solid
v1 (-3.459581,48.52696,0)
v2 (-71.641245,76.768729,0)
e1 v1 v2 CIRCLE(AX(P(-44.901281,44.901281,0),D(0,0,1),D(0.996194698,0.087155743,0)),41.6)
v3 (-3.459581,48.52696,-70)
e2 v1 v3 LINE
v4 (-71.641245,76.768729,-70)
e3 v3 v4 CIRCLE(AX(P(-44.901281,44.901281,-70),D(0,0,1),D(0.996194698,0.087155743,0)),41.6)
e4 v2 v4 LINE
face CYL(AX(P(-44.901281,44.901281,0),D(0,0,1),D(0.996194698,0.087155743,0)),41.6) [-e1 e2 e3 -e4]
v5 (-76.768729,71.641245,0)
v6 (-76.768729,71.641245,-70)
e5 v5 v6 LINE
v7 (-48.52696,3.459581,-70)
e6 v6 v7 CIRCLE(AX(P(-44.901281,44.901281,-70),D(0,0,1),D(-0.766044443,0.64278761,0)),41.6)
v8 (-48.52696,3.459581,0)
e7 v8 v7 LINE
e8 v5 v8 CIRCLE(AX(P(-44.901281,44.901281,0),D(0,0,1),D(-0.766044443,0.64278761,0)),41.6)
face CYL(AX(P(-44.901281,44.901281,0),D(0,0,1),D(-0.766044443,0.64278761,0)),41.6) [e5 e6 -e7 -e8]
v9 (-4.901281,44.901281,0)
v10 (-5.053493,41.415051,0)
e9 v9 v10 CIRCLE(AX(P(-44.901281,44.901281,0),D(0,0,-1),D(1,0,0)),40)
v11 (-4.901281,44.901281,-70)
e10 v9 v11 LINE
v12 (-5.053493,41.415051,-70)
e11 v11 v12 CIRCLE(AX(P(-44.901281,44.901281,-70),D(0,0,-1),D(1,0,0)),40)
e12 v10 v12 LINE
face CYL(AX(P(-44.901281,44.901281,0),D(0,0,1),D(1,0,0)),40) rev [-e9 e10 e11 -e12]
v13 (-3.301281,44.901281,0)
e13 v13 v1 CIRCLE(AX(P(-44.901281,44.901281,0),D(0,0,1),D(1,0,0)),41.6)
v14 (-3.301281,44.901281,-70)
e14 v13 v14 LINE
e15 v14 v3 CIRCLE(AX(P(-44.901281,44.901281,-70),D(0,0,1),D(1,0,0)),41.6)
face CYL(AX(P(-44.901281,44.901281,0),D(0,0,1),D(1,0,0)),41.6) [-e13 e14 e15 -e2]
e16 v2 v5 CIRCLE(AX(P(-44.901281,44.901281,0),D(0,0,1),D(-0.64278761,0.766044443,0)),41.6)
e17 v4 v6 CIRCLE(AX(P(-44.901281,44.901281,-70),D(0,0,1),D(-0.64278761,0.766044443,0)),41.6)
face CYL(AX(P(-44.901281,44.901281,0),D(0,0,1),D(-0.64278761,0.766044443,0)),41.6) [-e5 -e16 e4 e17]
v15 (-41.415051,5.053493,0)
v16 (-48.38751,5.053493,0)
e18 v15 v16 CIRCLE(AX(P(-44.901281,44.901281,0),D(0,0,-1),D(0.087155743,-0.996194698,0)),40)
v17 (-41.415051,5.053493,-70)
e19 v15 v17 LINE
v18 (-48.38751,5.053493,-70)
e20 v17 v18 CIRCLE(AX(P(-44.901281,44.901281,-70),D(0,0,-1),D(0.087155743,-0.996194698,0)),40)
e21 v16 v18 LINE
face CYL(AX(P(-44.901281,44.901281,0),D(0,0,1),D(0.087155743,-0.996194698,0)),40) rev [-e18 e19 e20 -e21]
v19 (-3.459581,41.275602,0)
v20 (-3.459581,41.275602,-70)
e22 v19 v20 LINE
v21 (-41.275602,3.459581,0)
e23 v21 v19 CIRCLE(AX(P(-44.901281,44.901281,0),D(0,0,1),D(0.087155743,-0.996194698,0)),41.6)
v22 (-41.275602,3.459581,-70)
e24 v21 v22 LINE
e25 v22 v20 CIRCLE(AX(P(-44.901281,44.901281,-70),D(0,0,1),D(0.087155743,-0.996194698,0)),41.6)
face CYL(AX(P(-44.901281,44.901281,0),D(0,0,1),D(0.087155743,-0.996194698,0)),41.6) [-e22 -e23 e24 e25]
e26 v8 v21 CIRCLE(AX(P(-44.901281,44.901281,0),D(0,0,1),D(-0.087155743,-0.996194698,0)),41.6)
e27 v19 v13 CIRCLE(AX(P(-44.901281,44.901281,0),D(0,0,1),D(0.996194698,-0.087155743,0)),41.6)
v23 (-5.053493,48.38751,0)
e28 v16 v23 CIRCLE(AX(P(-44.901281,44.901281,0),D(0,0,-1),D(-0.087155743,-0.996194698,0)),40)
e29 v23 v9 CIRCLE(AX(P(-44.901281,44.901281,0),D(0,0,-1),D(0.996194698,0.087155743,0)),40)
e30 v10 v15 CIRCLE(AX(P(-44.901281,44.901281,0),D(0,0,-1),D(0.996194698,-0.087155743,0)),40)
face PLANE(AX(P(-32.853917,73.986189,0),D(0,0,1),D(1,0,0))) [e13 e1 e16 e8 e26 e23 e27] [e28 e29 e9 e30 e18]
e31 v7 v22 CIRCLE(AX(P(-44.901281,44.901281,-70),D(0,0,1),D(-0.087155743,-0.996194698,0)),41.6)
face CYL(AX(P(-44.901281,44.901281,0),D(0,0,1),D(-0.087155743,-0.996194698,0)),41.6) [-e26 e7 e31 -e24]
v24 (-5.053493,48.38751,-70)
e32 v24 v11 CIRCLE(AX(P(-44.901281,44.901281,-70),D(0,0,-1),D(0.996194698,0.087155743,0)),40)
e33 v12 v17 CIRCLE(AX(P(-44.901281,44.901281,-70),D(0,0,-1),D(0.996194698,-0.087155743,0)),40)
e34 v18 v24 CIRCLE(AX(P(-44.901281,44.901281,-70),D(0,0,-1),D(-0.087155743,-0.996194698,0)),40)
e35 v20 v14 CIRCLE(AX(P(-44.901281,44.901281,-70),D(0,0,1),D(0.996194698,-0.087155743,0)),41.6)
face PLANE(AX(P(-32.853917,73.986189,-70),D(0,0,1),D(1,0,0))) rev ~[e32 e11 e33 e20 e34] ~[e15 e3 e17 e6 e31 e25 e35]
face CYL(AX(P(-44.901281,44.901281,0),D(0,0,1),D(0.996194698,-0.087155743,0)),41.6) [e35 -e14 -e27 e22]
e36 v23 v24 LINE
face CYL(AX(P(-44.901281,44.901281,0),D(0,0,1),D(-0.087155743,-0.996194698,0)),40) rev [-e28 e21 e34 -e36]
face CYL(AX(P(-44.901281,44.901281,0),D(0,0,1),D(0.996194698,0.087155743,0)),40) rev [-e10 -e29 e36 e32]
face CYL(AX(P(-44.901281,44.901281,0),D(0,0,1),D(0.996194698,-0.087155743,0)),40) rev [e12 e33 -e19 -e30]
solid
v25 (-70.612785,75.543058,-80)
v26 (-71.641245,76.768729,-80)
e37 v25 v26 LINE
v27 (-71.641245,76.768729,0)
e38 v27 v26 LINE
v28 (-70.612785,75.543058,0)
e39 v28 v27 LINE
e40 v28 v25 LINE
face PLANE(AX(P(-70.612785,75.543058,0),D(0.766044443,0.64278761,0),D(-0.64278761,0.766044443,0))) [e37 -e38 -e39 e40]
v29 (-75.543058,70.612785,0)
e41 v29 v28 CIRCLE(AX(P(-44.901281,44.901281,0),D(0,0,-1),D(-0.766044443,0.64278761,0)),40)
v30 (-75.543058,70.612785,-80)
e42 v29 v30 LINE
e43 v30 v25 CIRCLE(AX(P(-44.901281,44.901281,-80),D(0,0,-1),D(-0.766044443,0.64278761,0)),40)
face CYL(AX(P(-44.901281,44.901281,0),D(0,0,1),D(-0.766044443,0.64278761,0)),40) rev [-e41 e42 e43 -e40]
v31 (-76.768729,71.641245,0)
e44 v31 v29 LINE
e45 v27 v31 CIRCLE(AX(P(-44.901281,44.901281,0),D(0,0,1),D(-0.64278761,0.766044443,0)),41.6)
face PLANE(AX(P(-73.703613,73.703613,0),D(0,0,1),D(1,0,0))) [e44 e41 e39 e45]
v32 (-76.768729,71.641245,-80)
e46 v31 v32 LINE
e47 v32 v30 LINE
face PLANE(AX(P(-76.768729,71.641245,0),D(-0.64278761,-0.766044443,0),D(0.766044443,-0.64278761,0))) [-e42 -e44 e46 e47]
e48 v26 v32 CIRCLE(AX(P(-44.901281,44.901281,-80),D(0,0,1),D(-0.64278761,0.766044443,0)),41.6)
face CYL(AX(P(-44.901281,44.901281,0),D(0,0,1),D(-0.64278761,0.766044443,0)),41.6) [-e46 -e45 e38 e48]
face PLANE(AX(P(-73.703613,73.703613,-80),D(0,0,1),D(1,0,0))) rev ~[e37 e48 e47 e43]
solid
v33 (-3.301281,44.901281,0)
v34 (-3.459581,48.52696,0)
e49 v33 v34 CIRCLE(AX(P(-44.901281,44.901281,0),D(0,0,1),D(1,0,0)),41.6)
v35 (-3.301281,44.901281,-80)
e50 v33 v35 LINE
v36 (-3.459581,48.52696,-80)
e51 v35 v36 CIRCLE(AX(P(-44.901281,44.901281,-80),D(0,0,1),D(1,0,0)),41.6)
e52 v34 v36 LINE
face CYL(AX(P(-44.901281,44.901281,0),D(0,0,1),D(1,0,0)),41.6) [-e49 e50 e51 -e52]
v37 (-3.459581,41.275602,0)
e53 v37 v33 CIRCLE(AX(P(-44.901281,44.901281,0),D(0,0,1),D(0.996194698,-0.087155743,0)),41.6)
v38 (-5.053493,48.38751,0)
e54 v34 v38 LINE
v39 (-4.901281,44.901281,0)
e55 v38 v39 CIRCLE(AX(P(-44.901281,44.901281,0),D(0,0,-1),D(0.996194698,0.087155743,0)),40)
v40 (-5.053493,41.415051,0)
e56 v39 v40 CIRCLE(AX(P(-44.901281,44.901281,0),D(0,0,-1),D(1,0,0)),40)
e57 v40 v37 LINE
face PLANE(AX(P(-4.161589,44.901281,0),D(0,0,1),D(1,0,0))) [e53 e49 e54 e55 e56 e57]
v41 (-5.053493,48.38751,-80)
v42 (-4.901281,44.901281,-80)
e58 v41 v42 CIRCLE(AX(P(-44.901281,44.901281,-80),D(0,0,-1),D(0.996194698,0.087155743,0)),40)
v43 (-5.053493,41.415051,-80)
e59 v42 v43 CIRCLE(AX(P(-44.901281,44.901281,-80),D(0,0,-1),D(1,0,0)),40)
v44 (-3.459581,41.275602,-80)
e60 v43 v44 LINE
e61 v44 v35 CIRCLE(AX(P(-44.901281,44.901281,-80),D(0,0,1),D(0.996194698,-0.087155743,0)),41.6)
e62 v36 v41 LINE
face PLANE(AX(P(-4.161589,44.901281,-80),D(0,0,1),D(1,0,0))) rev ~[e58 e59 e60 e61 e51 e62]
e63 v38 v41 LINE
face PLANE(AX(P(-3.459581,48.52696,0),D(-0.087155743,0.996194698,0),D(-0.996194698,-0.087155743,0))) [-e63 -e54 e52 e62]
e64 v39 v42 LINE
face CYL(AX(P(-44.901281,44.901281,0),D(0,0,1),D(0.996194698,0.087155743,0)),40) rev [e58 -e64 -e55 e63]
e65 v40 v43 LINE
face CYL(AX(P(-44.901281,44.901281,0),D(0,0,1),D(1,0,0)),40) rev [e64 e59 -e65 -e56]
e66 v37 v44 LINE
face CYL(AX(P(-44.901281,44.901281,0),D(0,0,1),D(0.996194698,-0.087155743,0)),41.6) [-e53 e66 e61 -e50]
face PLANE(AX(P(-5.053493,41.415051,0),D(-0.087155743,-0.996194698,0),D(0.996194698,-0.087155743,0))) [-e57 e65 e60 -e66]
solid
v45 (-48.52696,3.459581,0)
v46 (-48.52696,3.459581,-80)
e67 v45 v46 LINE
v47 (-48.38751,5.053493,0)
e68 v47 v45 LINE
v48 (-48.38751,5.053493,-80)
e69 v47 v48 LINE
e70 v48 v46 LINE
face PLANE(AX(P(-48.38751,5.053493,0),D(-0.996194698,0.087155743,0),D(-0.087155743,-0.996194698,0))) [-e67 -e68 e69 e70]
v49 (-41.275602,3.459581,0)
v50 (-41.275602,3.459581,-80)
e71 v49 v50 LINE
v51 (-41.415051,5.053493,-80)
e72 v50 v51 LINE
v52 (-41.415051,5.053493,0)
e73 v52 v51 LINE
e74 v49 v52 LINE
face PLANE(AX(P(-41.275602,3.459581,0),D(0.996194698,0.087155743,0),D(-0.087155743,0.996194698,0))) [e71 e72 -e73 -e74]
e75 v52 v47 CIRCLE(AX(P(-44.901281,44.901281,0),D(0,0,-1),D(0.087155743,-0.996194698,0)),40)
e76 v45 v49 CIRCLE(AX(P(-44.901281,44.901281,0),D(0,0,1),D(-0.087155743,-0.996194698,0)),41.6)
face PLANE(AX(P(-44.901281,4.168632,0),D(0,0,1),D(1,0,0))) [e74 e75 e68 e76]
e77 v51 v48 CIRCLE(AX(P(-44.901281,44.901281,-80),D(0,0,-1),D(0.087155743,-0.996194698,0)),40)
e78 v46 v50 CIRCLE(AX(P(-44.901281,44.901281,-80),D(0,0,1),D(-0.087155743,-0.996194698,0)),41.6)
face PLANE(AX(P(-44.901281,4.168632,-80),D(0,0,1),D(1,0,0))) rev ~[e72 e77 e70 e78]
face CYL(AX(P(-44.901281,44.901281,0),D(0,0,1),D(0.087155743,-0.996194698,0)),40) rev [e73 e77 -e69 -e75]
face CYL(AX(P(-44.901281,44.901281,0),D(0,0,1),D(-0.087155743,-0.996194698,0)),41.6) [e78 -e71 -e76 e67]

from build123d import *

# Parameters (mm, degrees)
F1_DEPTH = 80
F2_DEPTH = 70


with BuildPart() as f1:
    # F0 (on Top) → F1 (new body)
    with BuildSketch(Plane.XY):
        with BuildLine():
            Line((-70.6127849928, 75.5430583301), (-71.6412451683, 76.7687294391))
            ThreePointArc((-71.6412451683, 76.7687294391), (-74.3169227027, 74.3169227027), (-76.7687294391, 71.6412451683))
            Line((-76.7687294391, 71.6412451683), (-75.5430583301, 70.6127849928))
            ThreePointArc((-75.5430583301, 70.6127849928), (-73.1855518528, 73.1855518528), (-70.6127849928, 75.5430583301))
        make_face()
    extrude(amount=-F1_DEPTH)


with BuildPart() as f1b:
    # F0 (on Top) → F1, piece 2 (new body)
    with BuildSketch(Plane.XY):
        with BuildLine():
            Line((-5.0534926817, 41.4150508954), (-3.4595811647, 41.275601707))
            ThreePointArc((-3.4595811647, 41.275601707), (-3.3408745875, 43.0867140909), (-3.3012806053, 44.9012806053))
            ThreePointArc((-3.3012806053, 44.9012806053), (-3.3408745875, 46.7158471197), (-3.4595811647, 48.5269595036))
            Line((-3.4595811647, 48.5269595036), (-5.0534926817, 48.3875103153))
            ThreePointArc((-5.0534926817, 48.3875103153), (-4.9393517421, 46.6460561), (-4.9012806053, 44.9012806053))
            ThreePointArc((-4.9012806053, 44.9012806053), (-4.9393517421, 43.1565051107), (-5.0534926817, 41.4150508954))
        make_face()
    extrude(amount=-F1_DEPTH)


with BuildPart() as f1c:
    # F0 (on Top) → F1, piece 3 (new body)
    with BuildSketch(Plane.XY):
        with BuildLine():
            ThreePointArc((-48.5269595036, 3.4595811647), (-44.9012806053, 3.3012806053), (-41.275601707, 3.4595811647))
            Line((-41.275601707, 3.4595811647), (-41.4150508954, 5.0534926817))
            ThreePointArc((-41.4150508954, 5.0534926817), (-44.9012806053, 4.9012806053), (-48.3875103153, 5.0534926817))
            Line((-48.3875103153, 5.0534926817), (-48.5269595036, 3.4595811647))
        make_face()
    extrude(amount=-F1_DEPTH)


with BuildPart() as f2:
    # F0 (on Top) → F2 (new body)
    with BuildSketch(Plane.XY):
        with BuildLine():
            Line((-5.0534926817, 48.3875103153), (-3.4595811647, 48.5269595036))
            ThreePointArc((-3.4595811647, 48.5269595036), (-28.981649819, 83.3346691578), (-71.6412451683, 76.7687294391))
            Line((-71.6412451683, 76.7687294391), (-70.6127849928, 75.5430583301))
            ThreePointArc((-70.6127849928, 75.5430583301), (-29.5939433107, 81.8564619058), (-5.0534926817, 48.3875103153))
        make_face()
        with BuildLine():
            Line((-70.6127849928, 75.5430583301), (-71.6412451683, 76.7687294391))
            ThreePointArc((-71.6412451683, 76.7687294391), (-74.3169227027, 74.3169227027), (-76.7687294391, 71.6412451683))
            Line((-76.7687294391, 71.6412451683), (-75.5430583301, 70.6127849928))
            ThreePointArc((-75.5430583301, 70.6127849928), (-73.1855518528, 73.1855518528), (-70.6127849928, 75.5430583301))
        make_face()
        with BuildLine():
            ThreePointArc((-76.7687294391, 71.6412451683), (-83.3346691578, 28.981649819), (-48.5269595036, 3.4595811647))
            Line((-48.5269595036, 3.4595811647), (-48.3875103153, 5.0534926817))
            ThreePointArc((-48.3875103153, 5.0534926817), (-81.8564619058, 29.5939433107), (-75.5430583301, 70.6127849928))
            Line((-75.5430583301, 70.6127849928), (-76.7687294391, 71.6412451683))
        make_face()
        with BuildLine():
            ThreePointArc((-48.5269595036, 3.4595811647), (-44.9012806053, 3.3012806053), (-41.275601707, 3.4595811647))
            Line((-41.275601707, 3.4595811647), (-41.4150508954, 5.0534926817))
            ThreePointArc((-41.4150508954, 5.0534926817), (-44.9012806053, 4.9012806053), (-48.3875103153, 5.0534926817))
            Line((-48.3875103153, 5.0534926817), (-48.5269595036, 3.4595811647))
        make_face()
        with BuildLine():
            ThreePointArc((-41.275601707, 3.4595811647), (-15.485638508, 15.485638508), (-3.4595811647, 41.275601707))
            Line((-3.4595811647, 41.275601707), (-5.0534926817, 41.4150508954))
            ThreePointArc((-5.0534926817, 41.4150508954), (-16.6170093579, 16.6170093579), (-41.4150508954, 5.0534926817))
            Line((-41.4150508954, 5.0534926817), (-41.275601707, 3.4595811647))
        make_face()
        with BuildLine():
            Line((-5.0534926817, 41.4150508954), (-3.4595811647, 41.275601707))
            ThreePointArc((-3.4595811647, 41.275601707), (-3.3408745875, 43.0867140909), (-3.3012806053, 44.9012806053))
            ThreePointArc((-3.3012806053, 44.9012806053), (-3.3408745875, 46.7158471197), (-3.4595811647, 48.5269595036))
            Line((-3.4595811647, 48.5269595036), (-5.0534926817, 48.3875103153))
            ThreePointArc((-5.0534926817, 48.3875103153), (-4.9393517421, 46.6460561), (-4.9012806053, 44.9012806053))
            ThreePointArc((-4.9012806053, 44.9012806053), (-4.9393517421, 43.1565051107), (-5.0534926817, 41.4150508954))
        make_face()
    extrude(amount=-F2_DEPTH)


solid = Compound([f1.part, f1b.part, f1c.part, f2.part])
